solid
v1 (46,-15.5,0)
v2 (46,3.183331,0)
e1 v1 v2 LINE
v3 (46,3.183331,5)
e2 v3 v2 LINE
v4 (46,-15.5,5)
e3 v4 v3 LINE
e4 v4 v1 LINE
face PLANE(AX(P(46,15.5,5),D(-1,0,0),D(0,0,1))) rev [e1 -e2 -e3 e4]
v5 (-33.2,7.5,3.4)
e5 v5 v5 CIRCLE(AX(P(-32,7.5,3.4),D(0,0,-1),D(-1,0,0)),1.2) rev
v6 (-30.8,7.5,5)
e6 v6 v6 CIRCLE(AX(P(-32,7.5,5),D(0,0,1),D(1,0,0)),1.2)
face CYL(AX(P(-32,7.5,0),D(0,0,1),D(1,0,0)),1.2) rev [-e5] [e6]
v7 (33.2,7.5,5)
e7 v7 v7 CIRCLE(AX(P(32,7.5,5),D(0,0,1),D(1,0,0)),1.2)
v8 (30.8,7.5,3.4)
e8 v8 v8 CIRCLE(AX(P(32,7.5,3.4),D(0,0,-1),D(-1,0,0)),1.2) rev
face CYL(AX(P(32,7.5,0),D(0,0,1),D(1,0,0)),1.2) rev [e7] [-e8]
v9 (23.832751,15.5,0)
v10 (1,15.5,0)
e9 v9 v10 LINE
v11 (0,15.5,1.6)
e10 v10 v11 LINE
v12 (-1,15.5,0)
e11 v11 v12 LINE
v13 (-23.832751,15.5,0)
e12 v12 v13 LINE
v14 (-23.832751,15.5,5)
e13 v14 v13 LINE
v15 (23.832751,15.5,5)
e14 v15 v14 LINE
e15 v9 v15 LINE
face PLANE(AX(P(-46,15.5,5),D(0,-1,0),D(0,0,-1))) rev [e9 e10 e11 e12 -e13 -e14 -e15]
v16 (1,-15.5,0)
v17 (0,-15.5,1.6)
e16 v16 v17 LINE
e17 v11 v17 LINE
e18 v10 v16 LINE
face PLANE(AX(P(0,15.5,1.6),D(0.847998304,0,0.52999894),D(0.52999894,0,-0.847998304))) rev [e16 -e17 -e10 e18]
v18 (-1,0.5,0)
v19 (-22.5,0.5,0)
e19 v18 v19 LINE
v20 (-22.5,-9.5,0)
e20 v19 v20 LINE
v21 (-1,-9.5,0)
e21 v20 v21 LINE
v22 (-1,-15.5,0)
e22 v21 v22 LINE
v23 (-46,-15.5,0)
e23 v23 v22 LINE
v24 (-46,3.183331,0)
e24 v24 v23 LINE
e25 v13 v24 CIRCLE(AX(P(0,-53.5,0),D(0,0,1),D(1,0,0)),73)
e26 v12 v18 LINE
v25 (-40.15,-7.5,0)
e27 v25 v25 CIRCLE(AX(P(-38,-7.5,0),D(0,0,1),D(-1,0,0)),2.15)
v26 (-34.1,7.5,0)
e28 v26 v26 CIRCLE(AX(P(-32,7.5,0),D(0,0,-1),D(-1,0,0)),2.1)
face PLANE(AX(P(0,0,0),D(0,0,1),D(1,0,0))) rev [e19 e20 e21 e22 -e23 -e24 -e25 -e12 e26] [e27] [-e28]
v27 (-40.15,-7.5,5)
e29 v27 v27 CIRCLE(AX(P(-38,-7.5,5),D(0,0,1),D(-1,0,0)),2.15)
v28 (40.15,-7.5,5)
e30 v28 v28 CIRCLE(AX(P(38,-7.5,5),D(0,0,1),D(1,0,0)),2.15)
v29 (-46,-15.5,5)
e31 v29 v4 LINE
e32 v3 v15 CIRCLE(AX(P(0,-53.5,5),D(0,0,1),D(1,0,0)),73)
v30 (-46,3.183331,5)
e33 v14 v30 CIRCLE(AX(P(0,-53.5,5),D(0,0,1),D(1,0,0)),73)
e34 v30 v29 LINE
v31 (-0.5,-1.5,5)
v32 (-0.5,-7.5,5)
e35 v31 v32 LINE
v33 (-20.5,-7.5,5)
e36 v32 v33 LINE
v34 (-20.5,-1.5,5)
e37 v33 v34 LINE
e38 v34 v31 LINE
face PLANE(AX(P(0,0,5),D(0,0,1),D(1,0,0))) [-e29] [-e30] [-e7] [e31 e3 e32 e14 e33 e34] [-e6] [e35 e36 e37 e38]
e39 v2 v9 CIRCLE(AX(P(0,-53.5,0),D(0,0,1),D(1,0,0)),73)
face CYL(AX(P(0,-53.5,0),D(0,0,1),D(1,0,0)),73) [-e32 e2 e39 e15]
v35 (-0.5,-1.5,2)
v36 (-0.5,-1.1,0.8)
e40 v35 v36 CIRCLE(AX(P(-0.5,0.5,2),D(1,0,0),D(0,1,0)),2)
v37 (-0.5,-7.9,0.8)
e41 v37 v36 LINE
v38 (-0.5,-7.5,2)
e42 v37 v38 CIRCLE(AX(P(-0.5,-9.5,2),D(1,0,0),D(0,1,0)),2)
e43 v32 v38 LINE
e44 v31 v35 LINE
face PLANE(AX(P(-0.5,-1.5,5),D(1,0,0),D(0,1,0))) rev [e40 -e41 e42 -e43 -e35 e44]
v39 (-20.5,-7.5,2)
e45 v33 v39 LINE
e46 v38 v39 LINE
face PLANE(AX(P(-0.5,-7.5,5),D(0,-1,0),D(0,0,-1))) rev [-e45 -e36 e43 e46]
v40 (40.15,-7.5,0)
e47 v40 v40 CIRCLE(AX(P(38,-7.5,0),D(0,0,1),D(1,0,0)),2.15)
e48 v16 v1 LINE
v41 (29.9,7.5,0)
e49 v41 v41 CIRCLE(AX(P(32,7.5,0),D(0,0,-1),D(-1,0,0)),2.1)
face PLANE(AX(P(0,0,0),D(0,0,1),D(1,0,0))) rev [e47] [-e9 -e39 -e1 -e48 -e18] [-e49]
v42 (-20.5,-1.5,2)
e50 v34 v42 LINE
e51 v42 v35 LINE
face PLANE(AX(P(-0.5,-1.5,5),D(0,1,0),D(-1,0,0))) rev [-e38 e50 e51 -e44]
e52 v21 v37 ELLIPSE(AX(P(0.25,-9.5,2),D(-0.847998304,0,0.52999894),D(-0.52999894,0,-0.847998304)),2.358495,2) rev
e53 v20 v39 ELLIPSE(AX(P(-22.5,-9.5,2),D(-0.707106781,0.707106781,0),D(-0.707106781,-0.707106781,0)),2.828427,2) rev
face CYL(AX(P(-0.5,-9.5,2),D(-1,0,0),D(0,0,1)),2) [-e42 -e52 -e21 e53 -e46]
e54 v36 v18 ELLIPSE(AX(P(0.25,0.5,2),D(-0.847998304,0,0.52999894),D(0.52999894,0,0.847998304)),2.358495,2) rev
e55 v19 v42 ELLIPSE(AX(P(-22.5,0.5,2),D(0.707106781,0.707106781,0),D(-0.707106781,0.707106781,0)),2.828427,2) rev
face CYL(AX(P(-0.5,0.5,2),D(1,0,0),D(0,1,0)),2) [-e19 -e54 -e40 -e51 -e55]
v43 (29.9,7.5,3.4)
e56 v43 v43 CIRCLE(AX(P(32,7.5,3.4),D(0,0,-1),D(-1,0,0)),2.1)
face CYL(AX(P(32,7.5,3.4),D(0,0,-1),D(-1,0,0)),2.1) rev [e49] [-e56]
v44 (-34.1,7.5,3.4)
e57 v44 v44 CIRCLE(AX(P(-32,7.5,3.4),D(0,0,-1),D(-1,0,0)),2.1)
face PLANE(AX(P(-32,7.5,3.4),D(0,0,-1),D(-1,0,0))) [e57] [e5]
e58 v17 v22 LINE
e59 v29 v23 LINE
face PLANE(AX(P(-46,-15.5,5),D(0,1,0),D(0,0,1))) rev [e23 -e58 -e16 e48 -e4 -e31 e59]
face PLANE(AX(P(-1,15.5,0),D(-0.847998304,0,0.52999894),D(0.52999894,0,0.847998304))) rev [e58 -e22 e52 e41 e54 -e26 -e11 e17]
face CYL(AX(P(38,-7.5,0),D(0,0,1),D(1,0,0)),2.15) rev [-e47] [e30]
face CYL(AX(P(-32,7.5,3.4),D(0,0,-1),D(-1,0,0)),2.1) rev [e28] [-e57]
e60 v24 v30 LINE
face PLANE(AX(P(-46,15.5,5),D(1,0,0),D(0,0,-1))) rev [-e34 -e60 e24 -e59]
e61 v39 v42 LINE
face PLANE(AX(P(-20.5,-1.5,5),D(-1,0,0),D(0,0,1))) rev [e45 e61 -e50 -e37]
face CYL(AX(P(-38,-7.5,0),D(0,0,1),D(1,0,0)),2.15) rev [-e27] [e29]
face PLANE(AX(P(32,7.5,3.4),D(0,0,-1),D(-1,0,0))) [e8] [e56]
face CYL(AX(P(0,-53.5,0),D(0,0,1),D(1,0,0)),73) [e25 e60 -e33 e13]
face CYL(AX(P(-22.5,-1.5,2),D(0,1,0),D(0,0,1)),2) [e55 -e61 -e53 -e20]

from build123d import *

# Parameters (mm, degrees)
SKETCH3_W           = 92
SKETCH3_H           = 31
BOSS_EXTRUDE2_DEPTH = 5
SKETCH4_R           = 103
SKETCH4_R_2         = 73
CUT_EXTRUDE1_DEPTH  = 49.79805324
SKETCH5_R           = 2.15
CUT_EXTRUDE2_DEPTH  = 49.79805324
CUT_EXTRUDE4_DEPTH  = 56.695601263
SKETCH8_R           = 1.2
CUT_EXTRUDE5_DEPTH  = 49.79805324
SKETCH9_R           = 2.1
CUT_EXTRUDE6_DEPTH  = 3.4
SKETCH10_W          = 20
SKETCH10_H          = 6
CUT_EXTRUDE7_DEPTH  = 49.79805324
FILLET1_R           = 2


with BuildPart() as part:
    # Sketch3 → Boss-Extrude2 (new body)
    with BuildSketch(Plane.XY):
        Rectangle(SKETCH3_W, SKETCH3_H)
    extrude(amount=BOSS_EXTRUDE2_DEPTH)

    # Sketch4 → Cut-Extrude1 (cut, through all)
    with BuildSketch(Plane.XY.offset(5)):
        with Locations((0, -53.5)):
            Circle(SKETCH4_R)
        with Locations((0, -53.5)):
            Circle(SKETCH4_R_2, mode=Mode.SUBTRACT)
    extrude(amount=-CUT_EXTRUDE1_DEPTH, mode=Mode.SUBTRACT)

    # Sketch5 → Cut-Extrude2 (cut, through all)
    with BuildSketch(Plane.XY.offset(5)):
        with Locations((38, -7.5)):
            Circle(SKETCH5_R)
        with Locations(Location((-38, -7.5, 0), (0, 0, 180))):
            Circle(SKETCH5_R)
    extrude(amount=-CUT_EXTRUDE2_DEPTH, mode=Mode.SUBTRACT)

    # Sketch7 → Cut-Extrude4 (cut, through all)
    with BuildSketch(Plane.XZ.offset(15.5)):
        Polygon((-1, 0), (0, 1.6), (1, 0), align=None)
    extrude(amount=-CUT_EXTRUDE4_DEPTH, mode=Mode.SUBTRACT)

    # Sketch8 → Cut-Extrude5 (cut, through all)
    with BuildSketch(Plane.XY.offset(5)):
        with Locations((-32, 7.5)):
            Circle(SKETCH8_R)
        with Locations((32, 7.5)):
            Circle(SKETCH8_R)
    extrude(amount=-CUT_EXTRUDE5_DEPTH, mode=Mode.SUBTRACT)

    # Sketch9 → Cut-Extrude6 (cut)
    with BuildSketch(Plane(origin=(0, 0, 0), x_dir=(-1, 0, 0), z_dir=(0, 0, -1))):
        with Locations((32, 7.5)):
            Circle(SKETCH9_R)
        with Locations((-32, 7.5)):
            Circle(SKETCH9_R)
    extrude(amount=-CUT_EXTRUDE6_DEPTH, mode=Mode.SUBTRACT)

    # Sketch10 → Cut-Extrude7 (cut, through all)
    with BuildSketch(Plane(origin=(0, 0, 0), x_dir=(-1, 0, 0), z_dir=(0, 0, -1))):
        with Locations((10.5, -4.5)):
            Rectangle(SKETCH10_W, SKETCH10_H)
    extrude(amount=-CUT_EXTRUDE7_DEPTH, mode=Mode.SUBTRACT)

    # Fillet1
    # the kernel refuses this fillet: 2 mm, written as the material it takes off along each edge
    with BuildSketch(Plane(origin=(-20.5, -7.5, 0), x_dir=(0, -1, 0), z_dir=(1, 0, 0))) as fillet1_piece_1_section:
        with BuildLine():
            CenterArc((FILLET1_R, -FILLET1_R), FILLET1_R, 90, 90)
            Line((0, -FILLET1_R), (0, 0))
            Line((0, 0), (FILLET1_R, 0))
        make_face()
    fillet1_piece_1 = extrude(amount=24.5, mode=Mode.PRIVATE)
    fillet1_piece_1 = split(fillet1_piece_1, bisect_by=Plane(origin=(-0.5, -7.952790229, 0.452790229), z_dir=(-1, 0, 0)), keep=Keep.TOP, mode=Mode.PRIVATE)
    add(fillet1_piece_1, mode=Mode.SUBTRACT)
    with BuildSketch(Plane(origin=(-20.5, -1.5, 0), x_dir=(-1, 0, 0), z_dir=(0, -1, 0))) as fillet1_piece_2:
        with BuildLine():
            CenterArc((FILLET1_R, -FILLET1_R), FILLET1_R, 90, 90)
            Line((0, -FILLET1_R), (0, 0))
            Line((0, 0), (FILLET1_R, 0))
        make_face()
    extrude(amount=6, mode=Mode.SUBTRACT)
    with BuildSketch(Plane(origin=(4, -1.5, 0), x_dir=(0, 1, 0), z_dir=(-1, 0, 0))) as fillet1_piece_3_section:
        with BuildLine():
            CenterArc((FILLET1_R, -FILLET1_R), FILLET1_R, 90, 90)
            Line((0, -FILLET1_R), (0, 0))
            Line((0, 0), (FILLET1_R, 0))
        make_face()
    fillet1_piece_3 = extrude(amount=24.5, mode=Mode.PRIVATE)
    fillet1_piece_3 = split(fillet1_piece_3, bisect_by=Plane(origin=(-0.5, -1.047209771, 0.452790229), z_dir=(-1, 0, 0)), keep=Keep.TOP, mode=Mode.PRIVATE)
    add(fillet1_piece_3, mode=Mode.SUBTRACT)
    with BuildSketch(Plane(origin=(-25.5, -7.5, 0), x_dir=(0, -1, 0), z_dir=(1, 0, 0))) as fillet1_piece_4a_section:
        with BuildLine():
            CenterArc((FILLET1_R, -FILLET1_R), FILLET1_R, 90, 90)
            Line((0, -FILLET1_R), (0, 0))
            Line((0, 0), (FILLET1_R, 0))
        make_face()
    fillet1_piece_4a = extrude(amount=29.5, mode=Mode.PRIVATE)
    fillet1_piece_4a = split(fillet1_piece_4a, bisect_by=Plane(origin=(-20.5, -7.952790229, 0.452790229), z_dir=(-1, 0, 0)), keep=Keep.TOP, mode=Mode.PRIVATE)
    with BuildSketch(Plane(origin=(-20.5, -1.5, 0), x_dir=(-1, 0, 0), z_dir=(0, -1, 0))) as fillet1_piece_4b_section:
        with BuildLine():
            CenterArc((FILLET1_R, -FILLET1_R), FILLET1_R, 90, 90)
            Line((0, -FILLET1_R), (0, 0))
            Line((0, 0), (FILLET1_R, 0))
        make_face()
    fillet1_piece_4b = extrude(amount=11, mode=Mode.PRIVATE)
    fillet1_piece_4b = split(fillet1_piece_4b, bisect_by=Plane(origin=(-20.952790229, -7.5, 0.452790229), z_dir=(0, -1, 0)), keep=Keep.TOP, mode=Mode.PRIVATE)
    fillet1_piece_4 = fillet1_piece_4a & fillet1_piece_4b
    add(fillet1_piece_4, mode=Mode.SUBTRACT)
    with BuildSketch(Plane(origin=(-20.5, 3.5, 0), x_dir=(-1, 0, 0), z_dir=(0, -1, 0))) as fillet1_piece_5a_section:
        with BuildLine():
            CenterArc((FILLET1_R, -FILLET1_R), FILLET1_R, 90, 90)
            Line((0, -FILLET1_R), (0, 0))
            Line((0, 0), (FILLET1_R, 0))
        make_face()
    fillet1_piece_5a = extrude(amount=11, mode=Mode.PRIVATE)
    fillet1_piece_5a = split(fillet1_piece_5a, bisect_by=Plane(origin=(-20.952790229, -1.5, 0.452790229), z_dir=(0, 1, 0)), keep=Keep.TOP, mode=Mode.PRIVATE)
    with BuildSketch(Plane(origin=(4, -1.5, 0), x_dir=(0, 1, 0), z_dir=(-1, 0, 0))) as fillet1_piece_5b_section:
        with BuildLine():
            CenterArc((FILLET1_R, -FILLET1_R), FILLET1_R, 90, 90)
            Line((0, -FILLET1_R), (0, 0))
            Line((0, 0), (FILLET1_R, 0))
        make_face()
    fillet1_piece_5b = extrude(amount=29.5, mode=Mode.PRIVATE)
    fillet1_piece_5b = split(fillet1_piece_5b, bisect_by=Plane(origin=(-20.5, -1.047209771, 0.452790229), z_dir=(-1, 0, 0)), keep=Keep.TOP, mode=Mode.PRIVATE)
    fillet1_piece_5 = fillet1_piece_5a & fillet1_piece_5b
    add(fillet1_piece_5, mode=Mode.SUBTRACT)


solid = part.part
